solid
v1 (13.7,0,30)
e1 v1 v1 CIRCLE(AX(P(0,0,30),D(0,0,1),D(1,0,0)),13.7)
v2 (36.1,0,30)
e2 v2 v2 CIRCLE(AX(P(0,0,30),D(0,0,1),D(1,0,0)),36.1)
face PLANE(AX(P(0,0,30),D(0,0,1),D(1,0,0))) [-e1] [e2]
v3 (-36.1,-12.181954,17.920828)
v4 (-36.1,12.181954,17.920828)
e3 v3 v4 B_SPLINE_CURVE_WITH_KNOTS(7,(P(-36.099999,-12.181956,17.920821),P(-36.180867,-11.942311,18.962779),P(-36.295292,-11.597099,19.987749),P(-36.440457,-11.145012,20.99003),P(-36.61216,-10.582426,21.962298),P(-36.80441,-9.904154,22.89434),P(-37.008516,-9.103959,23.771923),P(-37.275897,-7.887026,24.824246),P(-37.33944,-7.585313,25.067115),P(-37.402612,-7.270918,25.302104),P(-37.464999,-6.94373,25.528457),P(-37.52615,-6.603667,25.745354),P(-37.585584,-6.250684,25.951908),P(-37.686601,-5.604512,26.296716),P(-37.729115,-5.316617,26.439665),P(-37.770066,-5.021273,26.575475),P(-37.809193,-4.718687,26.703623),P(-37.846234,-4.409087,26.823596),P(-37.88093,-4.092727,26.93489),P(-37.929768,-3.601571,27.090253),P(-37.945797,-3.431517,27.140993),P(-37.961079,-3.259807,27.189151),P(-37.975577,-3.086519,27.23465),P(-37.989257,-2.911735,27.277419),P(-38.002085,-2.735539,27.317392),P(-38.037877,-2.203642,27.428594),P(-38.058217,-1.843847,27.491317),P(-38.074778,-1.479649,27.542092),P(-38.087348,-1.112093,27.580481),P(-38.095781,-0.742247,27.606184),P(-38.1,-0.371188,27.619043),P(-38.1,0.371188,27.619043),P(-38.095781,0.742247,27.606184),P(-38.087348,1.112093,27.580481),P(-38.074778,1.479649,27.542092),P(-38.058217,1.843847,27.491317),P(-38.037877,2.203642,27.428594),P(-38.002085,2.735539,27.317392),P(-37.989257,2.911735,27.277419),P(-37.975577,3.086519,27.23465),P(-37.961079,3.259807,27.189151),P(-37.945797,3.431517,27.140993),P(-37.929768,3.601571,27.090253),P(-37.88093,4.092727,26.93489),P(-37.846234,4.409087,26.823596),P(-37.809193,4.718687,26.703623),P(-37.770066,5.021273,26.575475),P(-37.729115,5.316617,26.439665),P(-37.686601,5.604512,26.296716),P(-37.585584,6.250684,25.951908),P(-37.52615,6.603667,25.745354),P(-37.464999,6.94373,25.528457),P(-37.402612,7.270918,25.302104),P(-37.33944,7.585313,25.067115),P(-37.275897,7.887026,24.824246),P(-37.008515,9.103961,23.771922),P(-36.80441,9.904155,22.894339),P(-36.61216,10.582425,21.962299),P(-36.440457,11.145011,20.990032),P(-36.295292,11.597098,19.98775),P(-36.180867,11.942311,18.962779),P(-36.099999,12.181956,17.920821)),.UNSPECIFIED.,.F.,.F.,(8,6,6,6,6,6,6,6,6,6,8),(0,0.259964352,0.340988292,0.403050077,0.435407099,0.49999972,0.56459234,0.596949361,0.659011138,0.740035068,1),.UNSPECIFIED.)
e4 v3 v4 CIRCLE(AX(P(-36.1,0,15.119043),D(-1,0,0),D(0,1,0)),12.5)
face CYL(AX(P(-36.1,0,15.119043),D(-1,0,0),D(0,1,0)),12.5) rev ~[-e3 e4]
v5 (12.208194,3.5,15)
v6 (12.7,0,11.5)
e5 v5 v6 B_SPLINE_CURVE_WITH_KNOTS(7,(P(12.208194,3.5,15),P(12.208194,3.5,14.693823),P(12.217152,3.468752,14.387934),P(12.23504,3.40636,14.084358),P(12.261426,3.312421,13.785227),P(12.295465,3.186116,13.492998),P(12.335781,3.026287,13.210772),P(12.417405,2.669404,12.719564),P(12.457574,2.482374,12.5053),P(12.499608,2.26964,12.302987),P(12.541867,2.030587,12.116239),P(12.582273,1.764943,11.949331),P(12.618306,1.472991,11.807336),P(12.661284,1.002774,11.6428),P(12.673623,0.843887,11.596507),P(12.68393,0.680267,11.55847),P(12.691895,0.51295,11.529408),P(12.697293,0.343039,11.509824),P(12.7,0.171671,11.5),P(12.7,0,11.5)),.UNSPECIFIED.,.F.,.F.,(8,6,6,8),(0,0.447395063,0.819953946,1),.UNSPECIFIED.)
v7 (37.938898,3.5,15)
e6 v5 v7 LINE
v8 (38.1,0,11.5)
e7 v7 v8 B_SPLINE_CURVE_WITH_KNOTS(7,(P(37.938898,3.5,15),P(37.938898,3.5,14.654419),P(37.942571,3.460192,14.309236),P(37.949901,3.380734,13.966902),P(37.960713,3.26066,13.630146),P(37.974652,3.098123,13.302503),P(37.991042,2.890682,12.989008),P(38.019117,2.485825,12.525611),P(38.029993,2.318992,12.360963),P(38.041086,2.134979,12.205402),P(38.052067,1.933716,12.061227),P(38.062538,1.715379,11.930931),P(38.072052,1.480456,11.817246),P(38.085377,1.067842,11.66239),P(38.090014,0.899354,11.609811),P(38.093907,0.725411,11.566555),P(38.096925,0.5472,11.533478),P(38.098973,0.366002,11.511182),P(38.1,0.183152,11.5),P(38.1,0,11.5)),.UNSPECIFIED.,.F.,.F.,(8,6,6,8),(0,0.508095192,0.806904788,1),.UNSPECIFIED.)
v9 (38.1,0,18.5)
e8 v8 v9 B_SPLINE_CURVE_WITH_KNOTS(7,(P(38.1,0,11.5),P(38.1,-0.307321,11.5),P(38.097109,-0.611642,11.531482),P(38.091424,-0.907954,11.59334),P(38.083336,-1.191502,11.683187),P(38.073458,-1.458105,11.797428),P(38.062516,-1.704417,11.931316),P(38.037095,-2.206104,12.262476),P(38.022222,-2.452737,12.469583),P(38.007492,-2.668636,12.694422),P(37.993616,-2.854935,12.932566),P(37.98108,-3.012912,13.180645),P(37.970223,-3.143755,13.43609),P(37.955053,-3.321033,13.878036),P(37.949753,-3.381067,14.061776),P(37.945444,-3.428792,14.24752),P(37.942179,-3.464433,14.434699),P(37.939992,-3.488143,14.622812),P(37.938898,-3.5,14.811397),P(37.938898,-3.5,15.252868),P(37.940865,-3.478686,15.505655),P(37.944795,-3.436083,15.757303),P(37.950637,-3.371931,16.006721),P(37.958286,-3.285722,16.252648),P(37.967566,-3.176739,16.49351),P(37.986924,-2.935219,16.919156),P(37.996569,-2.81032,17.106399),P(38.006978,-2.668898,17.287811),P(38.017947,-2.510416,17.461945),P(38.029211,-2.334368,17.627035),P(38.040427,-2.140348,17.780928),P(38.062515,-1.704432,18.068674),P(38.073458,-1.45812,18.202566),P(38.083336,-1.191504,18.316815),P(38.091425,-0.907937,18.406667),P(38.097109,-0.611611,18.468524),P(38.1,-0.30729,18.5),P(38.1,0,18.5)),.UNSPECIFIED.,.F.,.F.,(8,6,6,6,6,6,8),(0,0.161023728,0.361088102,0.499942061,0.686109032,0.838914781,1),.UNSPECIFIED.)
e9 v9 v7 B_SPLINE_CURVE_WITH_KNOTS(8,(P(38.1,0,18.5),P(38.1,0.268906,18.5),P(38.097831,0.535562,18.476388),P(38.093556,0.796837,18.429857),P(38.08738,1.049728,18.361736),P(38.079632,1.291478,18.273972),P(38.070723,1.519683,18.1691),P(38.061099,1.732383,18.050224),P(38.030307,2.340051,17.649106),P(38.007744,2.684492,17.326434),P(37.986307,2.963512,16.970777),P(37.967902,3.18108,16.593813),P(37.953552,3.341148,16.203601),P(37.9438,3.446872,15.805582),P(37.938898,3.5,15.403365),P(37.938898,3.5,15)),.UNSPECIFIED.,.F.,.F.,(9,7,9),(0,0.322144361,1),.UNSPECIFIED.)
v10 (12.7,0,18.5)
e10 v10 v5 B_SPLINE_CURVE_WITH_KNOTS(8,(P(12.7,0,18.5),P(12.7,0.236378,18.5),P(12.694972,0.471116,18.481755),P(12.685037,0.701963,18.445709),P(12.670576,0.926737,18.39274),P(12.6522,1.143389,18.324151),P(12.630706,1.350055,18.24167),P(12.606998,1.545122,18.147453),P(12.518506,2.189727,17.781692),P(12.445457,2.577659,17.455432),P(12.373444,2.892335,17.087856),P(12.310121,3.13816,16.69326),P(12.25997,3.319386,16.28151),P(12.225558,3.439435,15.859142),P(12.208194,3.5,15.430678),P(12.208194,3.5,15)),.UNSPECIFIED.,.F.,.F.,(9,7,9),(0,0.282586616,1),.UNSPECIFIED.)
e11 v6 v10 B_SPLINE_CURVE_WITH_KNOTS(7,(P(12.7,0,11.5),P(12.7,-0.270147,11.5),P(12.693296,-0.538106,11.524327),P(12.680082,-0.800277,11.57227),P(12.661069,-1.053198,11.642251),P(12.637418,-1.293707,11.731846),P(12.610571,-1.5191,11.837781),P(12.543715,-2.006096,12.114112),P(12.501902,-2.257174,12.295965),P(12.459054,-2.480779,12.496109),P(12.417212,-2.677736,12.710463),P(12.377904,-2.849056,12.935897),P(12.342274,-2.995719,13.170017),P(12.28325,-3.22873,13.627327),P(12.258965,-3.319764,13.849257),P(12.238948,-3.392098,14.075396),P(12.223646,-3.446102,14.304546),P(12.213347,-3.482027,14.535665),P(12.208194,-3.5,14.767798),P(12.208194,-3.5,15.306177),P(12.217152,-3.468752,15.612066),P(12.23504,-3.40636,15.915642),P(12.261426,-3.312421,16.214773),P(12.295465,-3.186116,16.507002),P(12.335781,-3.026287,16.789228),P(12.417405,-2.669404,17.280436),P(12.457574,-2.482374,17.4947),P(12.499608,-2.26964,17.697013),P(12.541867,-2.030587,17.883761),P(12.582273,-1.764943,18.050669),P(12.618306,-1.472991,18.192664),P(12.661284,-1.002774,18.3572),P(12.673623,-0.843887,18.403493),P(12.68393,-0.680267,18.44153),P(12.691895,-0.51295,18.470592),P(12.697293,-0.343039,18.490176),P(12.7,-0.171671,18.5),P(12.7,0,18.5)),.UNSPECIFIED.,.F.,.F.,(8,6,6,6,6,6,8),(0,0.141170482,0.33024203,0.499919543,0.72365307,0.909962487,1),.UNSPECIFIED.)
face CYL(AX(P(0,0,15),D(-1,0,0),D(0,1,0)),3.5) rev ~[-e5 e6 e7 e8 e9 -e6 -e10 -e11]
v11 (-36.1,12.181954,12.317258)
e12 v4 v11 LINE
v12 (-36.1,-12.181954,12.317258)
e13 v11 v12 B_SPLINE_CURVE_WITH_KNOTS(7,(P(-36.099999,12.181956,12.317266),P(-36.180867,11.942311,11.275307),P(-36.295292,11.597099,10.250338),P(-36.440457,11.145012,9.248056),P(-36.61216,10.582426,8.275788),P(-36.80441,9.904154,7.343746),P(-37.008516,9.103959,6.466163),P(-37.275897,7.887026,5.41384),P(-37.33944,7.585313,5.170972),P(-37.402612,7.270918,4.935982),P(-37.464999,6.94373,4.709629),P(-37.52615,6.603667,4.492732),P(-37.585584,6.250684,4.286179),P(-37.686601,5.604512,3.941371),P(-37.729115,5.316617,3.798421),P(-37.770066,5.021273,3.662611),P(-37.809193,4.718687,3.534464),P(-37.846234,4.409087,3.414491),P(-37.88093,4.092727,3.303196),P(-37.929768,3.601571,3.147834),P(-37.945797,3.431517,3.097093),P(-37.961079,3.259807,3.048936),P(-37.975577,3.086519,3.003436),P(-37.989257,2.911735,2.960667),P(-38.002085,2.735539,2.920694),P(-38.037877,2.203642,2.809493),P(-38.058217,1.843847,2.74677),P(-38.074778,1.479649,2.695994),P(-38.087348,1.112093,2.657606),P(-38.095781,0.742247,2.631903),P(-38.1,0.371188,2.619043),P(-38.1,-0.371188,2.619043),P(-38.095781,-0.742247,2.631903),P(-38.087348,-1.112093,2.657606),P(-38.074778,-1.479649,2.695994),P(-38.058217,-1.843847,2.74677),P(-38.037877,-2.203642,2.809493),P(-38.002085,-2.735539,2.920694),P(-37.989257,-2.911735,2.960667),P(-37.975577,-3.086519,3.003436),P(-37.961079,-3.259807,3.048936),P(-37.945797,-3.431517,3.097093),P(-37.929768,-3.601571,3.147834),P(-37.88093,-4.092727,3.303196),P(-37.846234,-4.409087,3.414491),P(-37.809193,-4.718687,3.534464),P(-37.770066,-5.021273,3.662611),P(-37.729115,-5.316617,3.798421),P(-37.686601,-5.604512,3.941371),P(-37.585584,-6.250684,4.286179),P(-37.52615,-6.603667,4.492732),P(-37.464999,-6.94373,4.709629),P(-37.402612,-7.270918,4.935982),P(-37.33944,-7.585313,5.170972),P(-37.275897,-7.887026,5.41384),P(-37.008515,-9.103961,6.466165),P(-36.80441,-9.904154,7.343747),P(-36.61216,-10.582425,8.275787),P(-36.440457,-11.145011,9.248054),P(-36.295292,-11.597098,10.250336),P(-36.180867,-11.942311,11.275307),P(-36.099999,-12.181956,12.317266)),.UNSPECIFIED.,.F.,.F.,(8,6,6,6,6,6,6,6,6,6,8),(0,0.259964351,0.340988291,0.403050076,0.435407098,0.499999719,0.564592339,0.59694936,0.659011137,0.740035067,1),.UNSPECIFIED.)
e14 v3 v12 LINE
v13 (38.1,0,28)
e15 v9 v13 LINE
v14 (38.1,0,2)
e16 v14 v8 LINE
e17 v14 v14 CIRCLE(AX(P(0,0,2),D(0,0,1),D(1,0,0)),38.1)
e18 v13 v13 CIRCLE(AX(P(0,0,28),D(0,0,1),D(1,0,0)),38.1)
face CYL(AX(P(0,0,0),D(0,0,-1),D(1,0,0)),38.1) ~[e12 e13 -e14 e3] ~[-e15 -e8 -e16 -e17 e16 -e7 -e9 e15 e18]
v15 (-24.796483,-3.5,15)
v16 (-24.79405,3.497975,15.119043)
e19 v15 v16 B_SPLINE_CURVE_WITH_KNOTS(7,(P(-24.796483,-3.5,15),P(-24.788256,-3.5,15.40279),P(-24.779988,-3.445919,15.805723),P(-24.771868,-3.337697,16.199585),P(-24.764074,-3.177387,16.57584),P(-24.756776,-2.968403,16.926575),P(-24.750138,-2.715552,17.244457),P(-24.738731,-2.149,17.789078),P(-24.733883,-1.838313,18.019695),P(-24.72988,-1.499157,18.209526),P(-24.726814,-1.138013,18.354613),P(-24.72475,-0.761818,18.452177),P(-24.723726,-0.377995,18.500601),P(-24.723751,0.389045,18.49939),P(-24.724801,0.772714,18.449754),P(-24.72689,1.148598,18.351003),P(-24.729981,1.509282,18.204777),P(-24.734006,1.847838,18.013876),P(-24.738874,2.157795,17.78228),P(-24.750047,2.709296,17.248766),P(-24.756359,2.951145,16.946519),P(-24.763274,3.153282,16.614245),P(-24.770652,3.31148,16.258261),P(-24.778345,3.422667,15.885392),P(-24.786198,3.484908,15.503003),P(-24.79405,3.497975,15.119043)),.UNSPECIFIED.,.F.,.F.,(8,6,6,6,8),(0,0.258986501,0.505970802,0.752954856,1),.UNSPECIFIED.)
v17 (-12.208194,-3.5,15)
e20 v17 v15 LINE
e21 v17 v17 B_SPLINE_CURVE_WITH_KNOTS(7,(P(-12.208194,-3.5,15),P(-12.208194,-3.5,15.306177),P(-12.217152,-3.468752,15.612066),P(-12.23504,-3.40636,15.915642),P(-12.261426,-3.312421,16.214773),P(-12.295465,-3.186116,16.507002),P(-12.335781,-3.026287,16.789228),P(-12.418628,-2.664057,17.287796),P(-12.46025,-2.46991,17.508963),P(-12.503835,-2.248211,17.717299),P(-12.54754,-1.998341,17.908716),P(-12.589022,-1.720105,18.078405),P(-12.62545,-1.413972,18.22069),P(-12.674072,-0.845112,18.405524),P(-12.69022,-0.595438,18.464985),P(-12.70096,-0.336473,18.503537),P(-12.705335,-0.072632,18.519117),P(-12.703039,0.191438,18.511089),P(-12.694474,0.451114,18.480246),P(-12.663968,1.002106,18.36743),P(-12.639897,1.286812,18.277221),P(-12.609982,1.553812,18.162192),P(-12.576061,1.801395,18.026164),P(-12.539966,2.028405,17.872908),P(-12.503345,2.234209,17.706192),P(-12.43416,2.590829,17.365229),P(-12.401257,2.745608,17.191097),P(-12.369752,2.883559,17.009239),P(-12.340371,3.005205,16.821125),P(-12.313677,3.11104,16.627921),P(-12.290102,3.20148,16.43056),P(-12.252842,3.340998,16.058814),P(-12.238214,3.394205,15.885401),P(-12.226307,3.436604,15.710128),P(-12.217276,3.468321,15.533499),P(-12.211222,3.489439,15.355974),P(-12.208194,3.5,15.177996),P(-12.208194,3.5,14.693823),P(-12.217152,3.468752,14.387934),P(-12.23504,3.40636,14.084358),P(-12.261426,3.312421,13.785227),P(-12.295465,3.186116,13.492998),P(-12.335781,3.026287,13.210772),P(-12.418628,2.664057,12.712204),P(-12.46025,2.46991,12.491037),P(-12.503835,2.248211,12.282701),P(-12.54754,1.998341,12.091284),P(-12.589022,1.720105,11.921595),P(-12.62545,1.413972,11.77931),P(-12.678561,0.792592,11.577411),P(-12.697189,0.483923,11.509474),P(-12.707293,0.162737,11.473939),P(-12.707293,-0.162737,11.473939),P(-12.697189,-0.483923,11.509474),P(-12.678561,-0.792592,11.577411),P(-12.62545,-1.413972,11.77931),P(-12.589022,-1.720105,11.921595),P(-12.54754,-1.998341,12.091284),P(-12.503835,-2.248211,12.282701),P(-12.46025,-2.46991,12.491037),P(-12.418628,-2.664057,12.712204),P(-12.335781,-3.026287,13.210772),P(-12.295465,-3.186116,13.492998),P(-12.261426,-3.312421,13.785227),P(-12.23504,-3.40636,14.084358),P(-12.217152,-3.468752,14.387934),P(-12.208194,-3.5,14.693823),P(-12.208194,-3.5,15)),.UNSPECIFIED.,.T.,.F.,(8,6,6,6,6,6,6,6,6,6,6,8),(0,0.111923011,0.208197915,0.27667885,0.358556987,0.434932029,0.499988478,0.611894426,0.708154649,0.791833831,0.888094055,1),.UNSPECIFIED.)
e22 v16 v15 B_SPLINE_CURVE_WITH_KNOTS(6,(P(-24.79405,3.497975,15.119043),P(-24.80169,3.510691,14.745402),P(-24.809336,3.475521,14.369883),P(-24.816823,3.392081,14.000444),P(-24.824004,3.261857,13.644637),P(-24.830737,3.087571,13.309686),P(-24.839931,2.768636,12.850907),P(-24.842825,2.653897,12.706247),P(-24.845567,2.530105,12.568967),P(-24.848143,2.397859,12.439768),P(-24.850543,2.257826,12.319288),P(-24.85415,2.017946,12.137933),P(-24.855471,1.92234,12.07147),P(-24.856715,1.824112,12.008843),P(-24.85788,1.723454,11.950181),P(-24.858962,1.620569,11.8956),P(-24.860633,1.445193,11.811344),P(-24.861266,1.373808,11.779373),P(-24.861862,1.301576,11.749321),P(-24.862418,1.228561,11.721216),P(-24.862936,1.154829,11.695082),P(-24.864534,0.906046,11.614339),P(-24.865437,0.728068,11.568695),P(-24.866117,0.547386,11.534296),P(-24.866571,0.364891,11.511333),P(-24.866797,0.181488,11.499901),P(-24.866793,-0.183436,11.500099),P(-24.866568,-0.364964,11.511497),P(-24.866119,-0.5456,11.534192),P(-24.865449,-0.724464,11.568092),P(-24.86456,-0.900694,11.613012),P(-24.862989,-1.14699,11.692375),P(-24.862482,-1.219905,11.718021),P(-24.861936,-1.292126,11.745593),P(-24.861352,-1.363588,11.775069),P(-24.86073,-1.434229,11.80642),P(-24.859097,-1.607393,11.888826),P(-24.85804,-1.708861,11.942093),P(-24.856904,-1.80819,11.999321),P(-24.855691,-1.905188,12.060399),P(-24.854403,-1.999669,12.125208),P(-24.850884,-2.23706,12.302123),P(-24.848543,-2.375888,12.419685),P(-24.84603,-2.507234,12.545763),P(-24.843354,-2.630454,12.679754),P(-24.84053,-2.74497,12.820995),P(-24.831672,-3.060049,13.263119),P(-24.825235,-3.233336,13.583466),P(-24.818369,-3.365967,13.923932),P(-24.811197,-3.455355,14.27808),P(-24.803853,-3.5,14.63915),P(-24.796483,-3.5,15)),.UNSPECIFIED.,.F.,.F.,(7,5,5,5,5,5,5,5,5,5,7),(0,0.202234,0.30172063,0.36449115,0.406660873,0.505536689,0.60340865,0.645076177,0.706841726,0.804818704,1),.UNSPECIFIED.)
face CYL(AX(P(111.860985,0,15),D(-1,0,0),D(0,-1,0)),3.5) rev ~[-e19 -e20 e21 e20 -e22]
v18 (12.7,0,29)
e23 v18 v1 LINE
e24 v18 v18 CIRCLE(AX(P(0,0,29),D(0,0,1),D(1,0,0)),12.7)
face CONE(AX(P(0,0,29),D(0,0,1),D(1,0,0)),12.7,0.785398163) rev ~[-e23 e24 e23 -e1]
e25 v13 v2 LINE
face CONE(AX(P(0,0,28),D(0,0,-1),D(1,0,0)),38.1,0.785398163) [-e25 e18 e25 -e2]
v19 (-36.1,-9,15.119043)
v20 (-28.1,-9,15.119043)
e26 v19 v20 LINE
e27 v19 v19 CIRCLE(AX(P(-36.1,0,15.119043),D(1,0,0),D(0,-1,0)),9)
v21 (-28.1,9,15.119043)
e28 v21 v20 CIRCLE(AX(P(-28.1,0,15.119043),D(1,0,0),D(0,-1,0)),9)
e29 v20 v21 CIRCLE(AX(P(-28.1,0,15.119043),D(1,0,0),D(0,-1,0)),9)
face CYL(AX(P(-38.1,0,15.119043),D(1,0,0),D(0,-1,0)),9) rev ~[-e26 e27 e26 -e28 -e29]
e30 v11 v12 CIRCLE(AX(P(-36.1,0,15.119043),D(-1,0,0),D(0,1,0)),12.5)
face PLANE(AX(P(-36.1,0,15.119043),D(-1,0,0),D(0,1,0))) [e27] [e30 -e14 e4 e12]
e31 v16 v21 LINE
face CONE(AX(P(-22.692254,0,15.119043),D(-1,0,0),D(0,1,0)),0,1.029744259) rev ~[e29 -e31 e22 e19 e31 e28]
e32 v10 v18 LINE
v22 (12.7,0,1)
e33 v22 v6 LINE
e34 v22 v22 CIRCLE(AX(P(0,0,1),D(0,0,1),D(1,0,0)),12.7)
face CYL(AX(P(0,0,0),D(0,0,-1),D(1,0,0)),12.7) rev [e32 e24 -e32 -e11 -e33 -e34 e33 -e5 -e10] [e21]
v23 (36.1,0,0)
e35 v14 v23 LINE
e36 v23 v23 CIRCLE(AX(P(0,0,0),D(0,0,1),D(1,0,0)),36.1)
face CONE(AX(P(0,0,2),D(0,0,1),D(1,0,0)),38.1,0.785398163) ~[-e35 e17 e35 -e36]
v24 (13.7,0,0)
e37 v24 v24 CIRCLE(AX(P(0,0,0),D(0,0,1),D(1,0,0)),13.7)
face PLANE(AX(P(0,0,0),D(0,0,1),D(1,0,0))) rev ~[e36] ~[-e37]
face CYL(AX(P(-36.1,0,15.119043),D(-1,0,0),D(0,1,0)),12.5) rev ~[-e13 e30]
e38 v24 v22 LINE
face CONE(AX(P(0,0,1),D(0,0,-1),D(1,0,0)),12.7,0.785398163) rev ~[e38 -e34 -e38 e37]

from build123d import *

# Parameters (mm, degrees)
F0_R           = 38.1
F0_R_2         = 12.7
F1_DEPTH       = 30
F2_SIZE        = 2
F4_D           = 7
F4_DEPTH       = 38.101
F5_D           = 7
F8_D           = 18
F8_DEPTH       = 10
F8_CBORE_D     = 25
F8_CBORE_DEPTH = 2
F8_TIP         = 5.4077455712
F9_SIZE        = 1


# Not quite as in the source:
# - a length typed as a fraction of an inch, garbled in the dataset ("3 / 203.2 mm" for 3/8 in), is restored


with BuildPart() as f1:
    # F0 (on Top) → F1 (new body)
    with BuildSketch(Plane.XY):
        Circle(F0_R)
        Circle(F0_R_2, mode=Mode.SUBTRACT)
    extrude(amount=F1_DEPTH)

    # F2
    f2_edges = [f1.edges().sort_by_distance(p)[0] for p in [
        (-38.1, 0, 30),
        (-38.1, 0, 0),
    ]]
    chamfer(f2_edges, length=F2_SIZE)

    # F4 (through all, one way)
    with BuildSketch(Plane(origin=(0, 0, 0), x_dir=(0, 1, 0), z_dir=(-1, 0, 0))):
        with Locations((0, -15)):
            Circle(F4_D / 2)
    extrude(amount=-F4_DEPTH, mode=Mode.SUBTRACT)

    # F5 (through all)
    with Locations(Plane.YZ):
        with Locations((0, 15)):
            Hole(F5_D / 2)

    # F8
    with Locations(Plane(origin=(-38.1, 0, 0), x_dir=(0, 1, 0), z_dir=(-1, 0, 0))):
        with Locations((0, -15.1190431789)):
            CounterBoreHole(F8_D / 2, F8_CBORE_D / 2, F8_CBORE_DEPTH, depth=F8_DEPTH)
            with Locations((0, 0, -(F8_DEPTH + F8_TIP / 2))):  # 118° drill point
                Cone(0, F8_D / 2, F8_TIP, mode=Mode.SUBTRACT)

    # F9
    f9_edges = [f1.edges().sort_by_distance(p)[0] for p in [
        (-12.7, 0, 0),
        (-12.7, 0, 30),
    ]]
    chamfer(f9_edges, length=F9_SIZE)


solid = f1.part
